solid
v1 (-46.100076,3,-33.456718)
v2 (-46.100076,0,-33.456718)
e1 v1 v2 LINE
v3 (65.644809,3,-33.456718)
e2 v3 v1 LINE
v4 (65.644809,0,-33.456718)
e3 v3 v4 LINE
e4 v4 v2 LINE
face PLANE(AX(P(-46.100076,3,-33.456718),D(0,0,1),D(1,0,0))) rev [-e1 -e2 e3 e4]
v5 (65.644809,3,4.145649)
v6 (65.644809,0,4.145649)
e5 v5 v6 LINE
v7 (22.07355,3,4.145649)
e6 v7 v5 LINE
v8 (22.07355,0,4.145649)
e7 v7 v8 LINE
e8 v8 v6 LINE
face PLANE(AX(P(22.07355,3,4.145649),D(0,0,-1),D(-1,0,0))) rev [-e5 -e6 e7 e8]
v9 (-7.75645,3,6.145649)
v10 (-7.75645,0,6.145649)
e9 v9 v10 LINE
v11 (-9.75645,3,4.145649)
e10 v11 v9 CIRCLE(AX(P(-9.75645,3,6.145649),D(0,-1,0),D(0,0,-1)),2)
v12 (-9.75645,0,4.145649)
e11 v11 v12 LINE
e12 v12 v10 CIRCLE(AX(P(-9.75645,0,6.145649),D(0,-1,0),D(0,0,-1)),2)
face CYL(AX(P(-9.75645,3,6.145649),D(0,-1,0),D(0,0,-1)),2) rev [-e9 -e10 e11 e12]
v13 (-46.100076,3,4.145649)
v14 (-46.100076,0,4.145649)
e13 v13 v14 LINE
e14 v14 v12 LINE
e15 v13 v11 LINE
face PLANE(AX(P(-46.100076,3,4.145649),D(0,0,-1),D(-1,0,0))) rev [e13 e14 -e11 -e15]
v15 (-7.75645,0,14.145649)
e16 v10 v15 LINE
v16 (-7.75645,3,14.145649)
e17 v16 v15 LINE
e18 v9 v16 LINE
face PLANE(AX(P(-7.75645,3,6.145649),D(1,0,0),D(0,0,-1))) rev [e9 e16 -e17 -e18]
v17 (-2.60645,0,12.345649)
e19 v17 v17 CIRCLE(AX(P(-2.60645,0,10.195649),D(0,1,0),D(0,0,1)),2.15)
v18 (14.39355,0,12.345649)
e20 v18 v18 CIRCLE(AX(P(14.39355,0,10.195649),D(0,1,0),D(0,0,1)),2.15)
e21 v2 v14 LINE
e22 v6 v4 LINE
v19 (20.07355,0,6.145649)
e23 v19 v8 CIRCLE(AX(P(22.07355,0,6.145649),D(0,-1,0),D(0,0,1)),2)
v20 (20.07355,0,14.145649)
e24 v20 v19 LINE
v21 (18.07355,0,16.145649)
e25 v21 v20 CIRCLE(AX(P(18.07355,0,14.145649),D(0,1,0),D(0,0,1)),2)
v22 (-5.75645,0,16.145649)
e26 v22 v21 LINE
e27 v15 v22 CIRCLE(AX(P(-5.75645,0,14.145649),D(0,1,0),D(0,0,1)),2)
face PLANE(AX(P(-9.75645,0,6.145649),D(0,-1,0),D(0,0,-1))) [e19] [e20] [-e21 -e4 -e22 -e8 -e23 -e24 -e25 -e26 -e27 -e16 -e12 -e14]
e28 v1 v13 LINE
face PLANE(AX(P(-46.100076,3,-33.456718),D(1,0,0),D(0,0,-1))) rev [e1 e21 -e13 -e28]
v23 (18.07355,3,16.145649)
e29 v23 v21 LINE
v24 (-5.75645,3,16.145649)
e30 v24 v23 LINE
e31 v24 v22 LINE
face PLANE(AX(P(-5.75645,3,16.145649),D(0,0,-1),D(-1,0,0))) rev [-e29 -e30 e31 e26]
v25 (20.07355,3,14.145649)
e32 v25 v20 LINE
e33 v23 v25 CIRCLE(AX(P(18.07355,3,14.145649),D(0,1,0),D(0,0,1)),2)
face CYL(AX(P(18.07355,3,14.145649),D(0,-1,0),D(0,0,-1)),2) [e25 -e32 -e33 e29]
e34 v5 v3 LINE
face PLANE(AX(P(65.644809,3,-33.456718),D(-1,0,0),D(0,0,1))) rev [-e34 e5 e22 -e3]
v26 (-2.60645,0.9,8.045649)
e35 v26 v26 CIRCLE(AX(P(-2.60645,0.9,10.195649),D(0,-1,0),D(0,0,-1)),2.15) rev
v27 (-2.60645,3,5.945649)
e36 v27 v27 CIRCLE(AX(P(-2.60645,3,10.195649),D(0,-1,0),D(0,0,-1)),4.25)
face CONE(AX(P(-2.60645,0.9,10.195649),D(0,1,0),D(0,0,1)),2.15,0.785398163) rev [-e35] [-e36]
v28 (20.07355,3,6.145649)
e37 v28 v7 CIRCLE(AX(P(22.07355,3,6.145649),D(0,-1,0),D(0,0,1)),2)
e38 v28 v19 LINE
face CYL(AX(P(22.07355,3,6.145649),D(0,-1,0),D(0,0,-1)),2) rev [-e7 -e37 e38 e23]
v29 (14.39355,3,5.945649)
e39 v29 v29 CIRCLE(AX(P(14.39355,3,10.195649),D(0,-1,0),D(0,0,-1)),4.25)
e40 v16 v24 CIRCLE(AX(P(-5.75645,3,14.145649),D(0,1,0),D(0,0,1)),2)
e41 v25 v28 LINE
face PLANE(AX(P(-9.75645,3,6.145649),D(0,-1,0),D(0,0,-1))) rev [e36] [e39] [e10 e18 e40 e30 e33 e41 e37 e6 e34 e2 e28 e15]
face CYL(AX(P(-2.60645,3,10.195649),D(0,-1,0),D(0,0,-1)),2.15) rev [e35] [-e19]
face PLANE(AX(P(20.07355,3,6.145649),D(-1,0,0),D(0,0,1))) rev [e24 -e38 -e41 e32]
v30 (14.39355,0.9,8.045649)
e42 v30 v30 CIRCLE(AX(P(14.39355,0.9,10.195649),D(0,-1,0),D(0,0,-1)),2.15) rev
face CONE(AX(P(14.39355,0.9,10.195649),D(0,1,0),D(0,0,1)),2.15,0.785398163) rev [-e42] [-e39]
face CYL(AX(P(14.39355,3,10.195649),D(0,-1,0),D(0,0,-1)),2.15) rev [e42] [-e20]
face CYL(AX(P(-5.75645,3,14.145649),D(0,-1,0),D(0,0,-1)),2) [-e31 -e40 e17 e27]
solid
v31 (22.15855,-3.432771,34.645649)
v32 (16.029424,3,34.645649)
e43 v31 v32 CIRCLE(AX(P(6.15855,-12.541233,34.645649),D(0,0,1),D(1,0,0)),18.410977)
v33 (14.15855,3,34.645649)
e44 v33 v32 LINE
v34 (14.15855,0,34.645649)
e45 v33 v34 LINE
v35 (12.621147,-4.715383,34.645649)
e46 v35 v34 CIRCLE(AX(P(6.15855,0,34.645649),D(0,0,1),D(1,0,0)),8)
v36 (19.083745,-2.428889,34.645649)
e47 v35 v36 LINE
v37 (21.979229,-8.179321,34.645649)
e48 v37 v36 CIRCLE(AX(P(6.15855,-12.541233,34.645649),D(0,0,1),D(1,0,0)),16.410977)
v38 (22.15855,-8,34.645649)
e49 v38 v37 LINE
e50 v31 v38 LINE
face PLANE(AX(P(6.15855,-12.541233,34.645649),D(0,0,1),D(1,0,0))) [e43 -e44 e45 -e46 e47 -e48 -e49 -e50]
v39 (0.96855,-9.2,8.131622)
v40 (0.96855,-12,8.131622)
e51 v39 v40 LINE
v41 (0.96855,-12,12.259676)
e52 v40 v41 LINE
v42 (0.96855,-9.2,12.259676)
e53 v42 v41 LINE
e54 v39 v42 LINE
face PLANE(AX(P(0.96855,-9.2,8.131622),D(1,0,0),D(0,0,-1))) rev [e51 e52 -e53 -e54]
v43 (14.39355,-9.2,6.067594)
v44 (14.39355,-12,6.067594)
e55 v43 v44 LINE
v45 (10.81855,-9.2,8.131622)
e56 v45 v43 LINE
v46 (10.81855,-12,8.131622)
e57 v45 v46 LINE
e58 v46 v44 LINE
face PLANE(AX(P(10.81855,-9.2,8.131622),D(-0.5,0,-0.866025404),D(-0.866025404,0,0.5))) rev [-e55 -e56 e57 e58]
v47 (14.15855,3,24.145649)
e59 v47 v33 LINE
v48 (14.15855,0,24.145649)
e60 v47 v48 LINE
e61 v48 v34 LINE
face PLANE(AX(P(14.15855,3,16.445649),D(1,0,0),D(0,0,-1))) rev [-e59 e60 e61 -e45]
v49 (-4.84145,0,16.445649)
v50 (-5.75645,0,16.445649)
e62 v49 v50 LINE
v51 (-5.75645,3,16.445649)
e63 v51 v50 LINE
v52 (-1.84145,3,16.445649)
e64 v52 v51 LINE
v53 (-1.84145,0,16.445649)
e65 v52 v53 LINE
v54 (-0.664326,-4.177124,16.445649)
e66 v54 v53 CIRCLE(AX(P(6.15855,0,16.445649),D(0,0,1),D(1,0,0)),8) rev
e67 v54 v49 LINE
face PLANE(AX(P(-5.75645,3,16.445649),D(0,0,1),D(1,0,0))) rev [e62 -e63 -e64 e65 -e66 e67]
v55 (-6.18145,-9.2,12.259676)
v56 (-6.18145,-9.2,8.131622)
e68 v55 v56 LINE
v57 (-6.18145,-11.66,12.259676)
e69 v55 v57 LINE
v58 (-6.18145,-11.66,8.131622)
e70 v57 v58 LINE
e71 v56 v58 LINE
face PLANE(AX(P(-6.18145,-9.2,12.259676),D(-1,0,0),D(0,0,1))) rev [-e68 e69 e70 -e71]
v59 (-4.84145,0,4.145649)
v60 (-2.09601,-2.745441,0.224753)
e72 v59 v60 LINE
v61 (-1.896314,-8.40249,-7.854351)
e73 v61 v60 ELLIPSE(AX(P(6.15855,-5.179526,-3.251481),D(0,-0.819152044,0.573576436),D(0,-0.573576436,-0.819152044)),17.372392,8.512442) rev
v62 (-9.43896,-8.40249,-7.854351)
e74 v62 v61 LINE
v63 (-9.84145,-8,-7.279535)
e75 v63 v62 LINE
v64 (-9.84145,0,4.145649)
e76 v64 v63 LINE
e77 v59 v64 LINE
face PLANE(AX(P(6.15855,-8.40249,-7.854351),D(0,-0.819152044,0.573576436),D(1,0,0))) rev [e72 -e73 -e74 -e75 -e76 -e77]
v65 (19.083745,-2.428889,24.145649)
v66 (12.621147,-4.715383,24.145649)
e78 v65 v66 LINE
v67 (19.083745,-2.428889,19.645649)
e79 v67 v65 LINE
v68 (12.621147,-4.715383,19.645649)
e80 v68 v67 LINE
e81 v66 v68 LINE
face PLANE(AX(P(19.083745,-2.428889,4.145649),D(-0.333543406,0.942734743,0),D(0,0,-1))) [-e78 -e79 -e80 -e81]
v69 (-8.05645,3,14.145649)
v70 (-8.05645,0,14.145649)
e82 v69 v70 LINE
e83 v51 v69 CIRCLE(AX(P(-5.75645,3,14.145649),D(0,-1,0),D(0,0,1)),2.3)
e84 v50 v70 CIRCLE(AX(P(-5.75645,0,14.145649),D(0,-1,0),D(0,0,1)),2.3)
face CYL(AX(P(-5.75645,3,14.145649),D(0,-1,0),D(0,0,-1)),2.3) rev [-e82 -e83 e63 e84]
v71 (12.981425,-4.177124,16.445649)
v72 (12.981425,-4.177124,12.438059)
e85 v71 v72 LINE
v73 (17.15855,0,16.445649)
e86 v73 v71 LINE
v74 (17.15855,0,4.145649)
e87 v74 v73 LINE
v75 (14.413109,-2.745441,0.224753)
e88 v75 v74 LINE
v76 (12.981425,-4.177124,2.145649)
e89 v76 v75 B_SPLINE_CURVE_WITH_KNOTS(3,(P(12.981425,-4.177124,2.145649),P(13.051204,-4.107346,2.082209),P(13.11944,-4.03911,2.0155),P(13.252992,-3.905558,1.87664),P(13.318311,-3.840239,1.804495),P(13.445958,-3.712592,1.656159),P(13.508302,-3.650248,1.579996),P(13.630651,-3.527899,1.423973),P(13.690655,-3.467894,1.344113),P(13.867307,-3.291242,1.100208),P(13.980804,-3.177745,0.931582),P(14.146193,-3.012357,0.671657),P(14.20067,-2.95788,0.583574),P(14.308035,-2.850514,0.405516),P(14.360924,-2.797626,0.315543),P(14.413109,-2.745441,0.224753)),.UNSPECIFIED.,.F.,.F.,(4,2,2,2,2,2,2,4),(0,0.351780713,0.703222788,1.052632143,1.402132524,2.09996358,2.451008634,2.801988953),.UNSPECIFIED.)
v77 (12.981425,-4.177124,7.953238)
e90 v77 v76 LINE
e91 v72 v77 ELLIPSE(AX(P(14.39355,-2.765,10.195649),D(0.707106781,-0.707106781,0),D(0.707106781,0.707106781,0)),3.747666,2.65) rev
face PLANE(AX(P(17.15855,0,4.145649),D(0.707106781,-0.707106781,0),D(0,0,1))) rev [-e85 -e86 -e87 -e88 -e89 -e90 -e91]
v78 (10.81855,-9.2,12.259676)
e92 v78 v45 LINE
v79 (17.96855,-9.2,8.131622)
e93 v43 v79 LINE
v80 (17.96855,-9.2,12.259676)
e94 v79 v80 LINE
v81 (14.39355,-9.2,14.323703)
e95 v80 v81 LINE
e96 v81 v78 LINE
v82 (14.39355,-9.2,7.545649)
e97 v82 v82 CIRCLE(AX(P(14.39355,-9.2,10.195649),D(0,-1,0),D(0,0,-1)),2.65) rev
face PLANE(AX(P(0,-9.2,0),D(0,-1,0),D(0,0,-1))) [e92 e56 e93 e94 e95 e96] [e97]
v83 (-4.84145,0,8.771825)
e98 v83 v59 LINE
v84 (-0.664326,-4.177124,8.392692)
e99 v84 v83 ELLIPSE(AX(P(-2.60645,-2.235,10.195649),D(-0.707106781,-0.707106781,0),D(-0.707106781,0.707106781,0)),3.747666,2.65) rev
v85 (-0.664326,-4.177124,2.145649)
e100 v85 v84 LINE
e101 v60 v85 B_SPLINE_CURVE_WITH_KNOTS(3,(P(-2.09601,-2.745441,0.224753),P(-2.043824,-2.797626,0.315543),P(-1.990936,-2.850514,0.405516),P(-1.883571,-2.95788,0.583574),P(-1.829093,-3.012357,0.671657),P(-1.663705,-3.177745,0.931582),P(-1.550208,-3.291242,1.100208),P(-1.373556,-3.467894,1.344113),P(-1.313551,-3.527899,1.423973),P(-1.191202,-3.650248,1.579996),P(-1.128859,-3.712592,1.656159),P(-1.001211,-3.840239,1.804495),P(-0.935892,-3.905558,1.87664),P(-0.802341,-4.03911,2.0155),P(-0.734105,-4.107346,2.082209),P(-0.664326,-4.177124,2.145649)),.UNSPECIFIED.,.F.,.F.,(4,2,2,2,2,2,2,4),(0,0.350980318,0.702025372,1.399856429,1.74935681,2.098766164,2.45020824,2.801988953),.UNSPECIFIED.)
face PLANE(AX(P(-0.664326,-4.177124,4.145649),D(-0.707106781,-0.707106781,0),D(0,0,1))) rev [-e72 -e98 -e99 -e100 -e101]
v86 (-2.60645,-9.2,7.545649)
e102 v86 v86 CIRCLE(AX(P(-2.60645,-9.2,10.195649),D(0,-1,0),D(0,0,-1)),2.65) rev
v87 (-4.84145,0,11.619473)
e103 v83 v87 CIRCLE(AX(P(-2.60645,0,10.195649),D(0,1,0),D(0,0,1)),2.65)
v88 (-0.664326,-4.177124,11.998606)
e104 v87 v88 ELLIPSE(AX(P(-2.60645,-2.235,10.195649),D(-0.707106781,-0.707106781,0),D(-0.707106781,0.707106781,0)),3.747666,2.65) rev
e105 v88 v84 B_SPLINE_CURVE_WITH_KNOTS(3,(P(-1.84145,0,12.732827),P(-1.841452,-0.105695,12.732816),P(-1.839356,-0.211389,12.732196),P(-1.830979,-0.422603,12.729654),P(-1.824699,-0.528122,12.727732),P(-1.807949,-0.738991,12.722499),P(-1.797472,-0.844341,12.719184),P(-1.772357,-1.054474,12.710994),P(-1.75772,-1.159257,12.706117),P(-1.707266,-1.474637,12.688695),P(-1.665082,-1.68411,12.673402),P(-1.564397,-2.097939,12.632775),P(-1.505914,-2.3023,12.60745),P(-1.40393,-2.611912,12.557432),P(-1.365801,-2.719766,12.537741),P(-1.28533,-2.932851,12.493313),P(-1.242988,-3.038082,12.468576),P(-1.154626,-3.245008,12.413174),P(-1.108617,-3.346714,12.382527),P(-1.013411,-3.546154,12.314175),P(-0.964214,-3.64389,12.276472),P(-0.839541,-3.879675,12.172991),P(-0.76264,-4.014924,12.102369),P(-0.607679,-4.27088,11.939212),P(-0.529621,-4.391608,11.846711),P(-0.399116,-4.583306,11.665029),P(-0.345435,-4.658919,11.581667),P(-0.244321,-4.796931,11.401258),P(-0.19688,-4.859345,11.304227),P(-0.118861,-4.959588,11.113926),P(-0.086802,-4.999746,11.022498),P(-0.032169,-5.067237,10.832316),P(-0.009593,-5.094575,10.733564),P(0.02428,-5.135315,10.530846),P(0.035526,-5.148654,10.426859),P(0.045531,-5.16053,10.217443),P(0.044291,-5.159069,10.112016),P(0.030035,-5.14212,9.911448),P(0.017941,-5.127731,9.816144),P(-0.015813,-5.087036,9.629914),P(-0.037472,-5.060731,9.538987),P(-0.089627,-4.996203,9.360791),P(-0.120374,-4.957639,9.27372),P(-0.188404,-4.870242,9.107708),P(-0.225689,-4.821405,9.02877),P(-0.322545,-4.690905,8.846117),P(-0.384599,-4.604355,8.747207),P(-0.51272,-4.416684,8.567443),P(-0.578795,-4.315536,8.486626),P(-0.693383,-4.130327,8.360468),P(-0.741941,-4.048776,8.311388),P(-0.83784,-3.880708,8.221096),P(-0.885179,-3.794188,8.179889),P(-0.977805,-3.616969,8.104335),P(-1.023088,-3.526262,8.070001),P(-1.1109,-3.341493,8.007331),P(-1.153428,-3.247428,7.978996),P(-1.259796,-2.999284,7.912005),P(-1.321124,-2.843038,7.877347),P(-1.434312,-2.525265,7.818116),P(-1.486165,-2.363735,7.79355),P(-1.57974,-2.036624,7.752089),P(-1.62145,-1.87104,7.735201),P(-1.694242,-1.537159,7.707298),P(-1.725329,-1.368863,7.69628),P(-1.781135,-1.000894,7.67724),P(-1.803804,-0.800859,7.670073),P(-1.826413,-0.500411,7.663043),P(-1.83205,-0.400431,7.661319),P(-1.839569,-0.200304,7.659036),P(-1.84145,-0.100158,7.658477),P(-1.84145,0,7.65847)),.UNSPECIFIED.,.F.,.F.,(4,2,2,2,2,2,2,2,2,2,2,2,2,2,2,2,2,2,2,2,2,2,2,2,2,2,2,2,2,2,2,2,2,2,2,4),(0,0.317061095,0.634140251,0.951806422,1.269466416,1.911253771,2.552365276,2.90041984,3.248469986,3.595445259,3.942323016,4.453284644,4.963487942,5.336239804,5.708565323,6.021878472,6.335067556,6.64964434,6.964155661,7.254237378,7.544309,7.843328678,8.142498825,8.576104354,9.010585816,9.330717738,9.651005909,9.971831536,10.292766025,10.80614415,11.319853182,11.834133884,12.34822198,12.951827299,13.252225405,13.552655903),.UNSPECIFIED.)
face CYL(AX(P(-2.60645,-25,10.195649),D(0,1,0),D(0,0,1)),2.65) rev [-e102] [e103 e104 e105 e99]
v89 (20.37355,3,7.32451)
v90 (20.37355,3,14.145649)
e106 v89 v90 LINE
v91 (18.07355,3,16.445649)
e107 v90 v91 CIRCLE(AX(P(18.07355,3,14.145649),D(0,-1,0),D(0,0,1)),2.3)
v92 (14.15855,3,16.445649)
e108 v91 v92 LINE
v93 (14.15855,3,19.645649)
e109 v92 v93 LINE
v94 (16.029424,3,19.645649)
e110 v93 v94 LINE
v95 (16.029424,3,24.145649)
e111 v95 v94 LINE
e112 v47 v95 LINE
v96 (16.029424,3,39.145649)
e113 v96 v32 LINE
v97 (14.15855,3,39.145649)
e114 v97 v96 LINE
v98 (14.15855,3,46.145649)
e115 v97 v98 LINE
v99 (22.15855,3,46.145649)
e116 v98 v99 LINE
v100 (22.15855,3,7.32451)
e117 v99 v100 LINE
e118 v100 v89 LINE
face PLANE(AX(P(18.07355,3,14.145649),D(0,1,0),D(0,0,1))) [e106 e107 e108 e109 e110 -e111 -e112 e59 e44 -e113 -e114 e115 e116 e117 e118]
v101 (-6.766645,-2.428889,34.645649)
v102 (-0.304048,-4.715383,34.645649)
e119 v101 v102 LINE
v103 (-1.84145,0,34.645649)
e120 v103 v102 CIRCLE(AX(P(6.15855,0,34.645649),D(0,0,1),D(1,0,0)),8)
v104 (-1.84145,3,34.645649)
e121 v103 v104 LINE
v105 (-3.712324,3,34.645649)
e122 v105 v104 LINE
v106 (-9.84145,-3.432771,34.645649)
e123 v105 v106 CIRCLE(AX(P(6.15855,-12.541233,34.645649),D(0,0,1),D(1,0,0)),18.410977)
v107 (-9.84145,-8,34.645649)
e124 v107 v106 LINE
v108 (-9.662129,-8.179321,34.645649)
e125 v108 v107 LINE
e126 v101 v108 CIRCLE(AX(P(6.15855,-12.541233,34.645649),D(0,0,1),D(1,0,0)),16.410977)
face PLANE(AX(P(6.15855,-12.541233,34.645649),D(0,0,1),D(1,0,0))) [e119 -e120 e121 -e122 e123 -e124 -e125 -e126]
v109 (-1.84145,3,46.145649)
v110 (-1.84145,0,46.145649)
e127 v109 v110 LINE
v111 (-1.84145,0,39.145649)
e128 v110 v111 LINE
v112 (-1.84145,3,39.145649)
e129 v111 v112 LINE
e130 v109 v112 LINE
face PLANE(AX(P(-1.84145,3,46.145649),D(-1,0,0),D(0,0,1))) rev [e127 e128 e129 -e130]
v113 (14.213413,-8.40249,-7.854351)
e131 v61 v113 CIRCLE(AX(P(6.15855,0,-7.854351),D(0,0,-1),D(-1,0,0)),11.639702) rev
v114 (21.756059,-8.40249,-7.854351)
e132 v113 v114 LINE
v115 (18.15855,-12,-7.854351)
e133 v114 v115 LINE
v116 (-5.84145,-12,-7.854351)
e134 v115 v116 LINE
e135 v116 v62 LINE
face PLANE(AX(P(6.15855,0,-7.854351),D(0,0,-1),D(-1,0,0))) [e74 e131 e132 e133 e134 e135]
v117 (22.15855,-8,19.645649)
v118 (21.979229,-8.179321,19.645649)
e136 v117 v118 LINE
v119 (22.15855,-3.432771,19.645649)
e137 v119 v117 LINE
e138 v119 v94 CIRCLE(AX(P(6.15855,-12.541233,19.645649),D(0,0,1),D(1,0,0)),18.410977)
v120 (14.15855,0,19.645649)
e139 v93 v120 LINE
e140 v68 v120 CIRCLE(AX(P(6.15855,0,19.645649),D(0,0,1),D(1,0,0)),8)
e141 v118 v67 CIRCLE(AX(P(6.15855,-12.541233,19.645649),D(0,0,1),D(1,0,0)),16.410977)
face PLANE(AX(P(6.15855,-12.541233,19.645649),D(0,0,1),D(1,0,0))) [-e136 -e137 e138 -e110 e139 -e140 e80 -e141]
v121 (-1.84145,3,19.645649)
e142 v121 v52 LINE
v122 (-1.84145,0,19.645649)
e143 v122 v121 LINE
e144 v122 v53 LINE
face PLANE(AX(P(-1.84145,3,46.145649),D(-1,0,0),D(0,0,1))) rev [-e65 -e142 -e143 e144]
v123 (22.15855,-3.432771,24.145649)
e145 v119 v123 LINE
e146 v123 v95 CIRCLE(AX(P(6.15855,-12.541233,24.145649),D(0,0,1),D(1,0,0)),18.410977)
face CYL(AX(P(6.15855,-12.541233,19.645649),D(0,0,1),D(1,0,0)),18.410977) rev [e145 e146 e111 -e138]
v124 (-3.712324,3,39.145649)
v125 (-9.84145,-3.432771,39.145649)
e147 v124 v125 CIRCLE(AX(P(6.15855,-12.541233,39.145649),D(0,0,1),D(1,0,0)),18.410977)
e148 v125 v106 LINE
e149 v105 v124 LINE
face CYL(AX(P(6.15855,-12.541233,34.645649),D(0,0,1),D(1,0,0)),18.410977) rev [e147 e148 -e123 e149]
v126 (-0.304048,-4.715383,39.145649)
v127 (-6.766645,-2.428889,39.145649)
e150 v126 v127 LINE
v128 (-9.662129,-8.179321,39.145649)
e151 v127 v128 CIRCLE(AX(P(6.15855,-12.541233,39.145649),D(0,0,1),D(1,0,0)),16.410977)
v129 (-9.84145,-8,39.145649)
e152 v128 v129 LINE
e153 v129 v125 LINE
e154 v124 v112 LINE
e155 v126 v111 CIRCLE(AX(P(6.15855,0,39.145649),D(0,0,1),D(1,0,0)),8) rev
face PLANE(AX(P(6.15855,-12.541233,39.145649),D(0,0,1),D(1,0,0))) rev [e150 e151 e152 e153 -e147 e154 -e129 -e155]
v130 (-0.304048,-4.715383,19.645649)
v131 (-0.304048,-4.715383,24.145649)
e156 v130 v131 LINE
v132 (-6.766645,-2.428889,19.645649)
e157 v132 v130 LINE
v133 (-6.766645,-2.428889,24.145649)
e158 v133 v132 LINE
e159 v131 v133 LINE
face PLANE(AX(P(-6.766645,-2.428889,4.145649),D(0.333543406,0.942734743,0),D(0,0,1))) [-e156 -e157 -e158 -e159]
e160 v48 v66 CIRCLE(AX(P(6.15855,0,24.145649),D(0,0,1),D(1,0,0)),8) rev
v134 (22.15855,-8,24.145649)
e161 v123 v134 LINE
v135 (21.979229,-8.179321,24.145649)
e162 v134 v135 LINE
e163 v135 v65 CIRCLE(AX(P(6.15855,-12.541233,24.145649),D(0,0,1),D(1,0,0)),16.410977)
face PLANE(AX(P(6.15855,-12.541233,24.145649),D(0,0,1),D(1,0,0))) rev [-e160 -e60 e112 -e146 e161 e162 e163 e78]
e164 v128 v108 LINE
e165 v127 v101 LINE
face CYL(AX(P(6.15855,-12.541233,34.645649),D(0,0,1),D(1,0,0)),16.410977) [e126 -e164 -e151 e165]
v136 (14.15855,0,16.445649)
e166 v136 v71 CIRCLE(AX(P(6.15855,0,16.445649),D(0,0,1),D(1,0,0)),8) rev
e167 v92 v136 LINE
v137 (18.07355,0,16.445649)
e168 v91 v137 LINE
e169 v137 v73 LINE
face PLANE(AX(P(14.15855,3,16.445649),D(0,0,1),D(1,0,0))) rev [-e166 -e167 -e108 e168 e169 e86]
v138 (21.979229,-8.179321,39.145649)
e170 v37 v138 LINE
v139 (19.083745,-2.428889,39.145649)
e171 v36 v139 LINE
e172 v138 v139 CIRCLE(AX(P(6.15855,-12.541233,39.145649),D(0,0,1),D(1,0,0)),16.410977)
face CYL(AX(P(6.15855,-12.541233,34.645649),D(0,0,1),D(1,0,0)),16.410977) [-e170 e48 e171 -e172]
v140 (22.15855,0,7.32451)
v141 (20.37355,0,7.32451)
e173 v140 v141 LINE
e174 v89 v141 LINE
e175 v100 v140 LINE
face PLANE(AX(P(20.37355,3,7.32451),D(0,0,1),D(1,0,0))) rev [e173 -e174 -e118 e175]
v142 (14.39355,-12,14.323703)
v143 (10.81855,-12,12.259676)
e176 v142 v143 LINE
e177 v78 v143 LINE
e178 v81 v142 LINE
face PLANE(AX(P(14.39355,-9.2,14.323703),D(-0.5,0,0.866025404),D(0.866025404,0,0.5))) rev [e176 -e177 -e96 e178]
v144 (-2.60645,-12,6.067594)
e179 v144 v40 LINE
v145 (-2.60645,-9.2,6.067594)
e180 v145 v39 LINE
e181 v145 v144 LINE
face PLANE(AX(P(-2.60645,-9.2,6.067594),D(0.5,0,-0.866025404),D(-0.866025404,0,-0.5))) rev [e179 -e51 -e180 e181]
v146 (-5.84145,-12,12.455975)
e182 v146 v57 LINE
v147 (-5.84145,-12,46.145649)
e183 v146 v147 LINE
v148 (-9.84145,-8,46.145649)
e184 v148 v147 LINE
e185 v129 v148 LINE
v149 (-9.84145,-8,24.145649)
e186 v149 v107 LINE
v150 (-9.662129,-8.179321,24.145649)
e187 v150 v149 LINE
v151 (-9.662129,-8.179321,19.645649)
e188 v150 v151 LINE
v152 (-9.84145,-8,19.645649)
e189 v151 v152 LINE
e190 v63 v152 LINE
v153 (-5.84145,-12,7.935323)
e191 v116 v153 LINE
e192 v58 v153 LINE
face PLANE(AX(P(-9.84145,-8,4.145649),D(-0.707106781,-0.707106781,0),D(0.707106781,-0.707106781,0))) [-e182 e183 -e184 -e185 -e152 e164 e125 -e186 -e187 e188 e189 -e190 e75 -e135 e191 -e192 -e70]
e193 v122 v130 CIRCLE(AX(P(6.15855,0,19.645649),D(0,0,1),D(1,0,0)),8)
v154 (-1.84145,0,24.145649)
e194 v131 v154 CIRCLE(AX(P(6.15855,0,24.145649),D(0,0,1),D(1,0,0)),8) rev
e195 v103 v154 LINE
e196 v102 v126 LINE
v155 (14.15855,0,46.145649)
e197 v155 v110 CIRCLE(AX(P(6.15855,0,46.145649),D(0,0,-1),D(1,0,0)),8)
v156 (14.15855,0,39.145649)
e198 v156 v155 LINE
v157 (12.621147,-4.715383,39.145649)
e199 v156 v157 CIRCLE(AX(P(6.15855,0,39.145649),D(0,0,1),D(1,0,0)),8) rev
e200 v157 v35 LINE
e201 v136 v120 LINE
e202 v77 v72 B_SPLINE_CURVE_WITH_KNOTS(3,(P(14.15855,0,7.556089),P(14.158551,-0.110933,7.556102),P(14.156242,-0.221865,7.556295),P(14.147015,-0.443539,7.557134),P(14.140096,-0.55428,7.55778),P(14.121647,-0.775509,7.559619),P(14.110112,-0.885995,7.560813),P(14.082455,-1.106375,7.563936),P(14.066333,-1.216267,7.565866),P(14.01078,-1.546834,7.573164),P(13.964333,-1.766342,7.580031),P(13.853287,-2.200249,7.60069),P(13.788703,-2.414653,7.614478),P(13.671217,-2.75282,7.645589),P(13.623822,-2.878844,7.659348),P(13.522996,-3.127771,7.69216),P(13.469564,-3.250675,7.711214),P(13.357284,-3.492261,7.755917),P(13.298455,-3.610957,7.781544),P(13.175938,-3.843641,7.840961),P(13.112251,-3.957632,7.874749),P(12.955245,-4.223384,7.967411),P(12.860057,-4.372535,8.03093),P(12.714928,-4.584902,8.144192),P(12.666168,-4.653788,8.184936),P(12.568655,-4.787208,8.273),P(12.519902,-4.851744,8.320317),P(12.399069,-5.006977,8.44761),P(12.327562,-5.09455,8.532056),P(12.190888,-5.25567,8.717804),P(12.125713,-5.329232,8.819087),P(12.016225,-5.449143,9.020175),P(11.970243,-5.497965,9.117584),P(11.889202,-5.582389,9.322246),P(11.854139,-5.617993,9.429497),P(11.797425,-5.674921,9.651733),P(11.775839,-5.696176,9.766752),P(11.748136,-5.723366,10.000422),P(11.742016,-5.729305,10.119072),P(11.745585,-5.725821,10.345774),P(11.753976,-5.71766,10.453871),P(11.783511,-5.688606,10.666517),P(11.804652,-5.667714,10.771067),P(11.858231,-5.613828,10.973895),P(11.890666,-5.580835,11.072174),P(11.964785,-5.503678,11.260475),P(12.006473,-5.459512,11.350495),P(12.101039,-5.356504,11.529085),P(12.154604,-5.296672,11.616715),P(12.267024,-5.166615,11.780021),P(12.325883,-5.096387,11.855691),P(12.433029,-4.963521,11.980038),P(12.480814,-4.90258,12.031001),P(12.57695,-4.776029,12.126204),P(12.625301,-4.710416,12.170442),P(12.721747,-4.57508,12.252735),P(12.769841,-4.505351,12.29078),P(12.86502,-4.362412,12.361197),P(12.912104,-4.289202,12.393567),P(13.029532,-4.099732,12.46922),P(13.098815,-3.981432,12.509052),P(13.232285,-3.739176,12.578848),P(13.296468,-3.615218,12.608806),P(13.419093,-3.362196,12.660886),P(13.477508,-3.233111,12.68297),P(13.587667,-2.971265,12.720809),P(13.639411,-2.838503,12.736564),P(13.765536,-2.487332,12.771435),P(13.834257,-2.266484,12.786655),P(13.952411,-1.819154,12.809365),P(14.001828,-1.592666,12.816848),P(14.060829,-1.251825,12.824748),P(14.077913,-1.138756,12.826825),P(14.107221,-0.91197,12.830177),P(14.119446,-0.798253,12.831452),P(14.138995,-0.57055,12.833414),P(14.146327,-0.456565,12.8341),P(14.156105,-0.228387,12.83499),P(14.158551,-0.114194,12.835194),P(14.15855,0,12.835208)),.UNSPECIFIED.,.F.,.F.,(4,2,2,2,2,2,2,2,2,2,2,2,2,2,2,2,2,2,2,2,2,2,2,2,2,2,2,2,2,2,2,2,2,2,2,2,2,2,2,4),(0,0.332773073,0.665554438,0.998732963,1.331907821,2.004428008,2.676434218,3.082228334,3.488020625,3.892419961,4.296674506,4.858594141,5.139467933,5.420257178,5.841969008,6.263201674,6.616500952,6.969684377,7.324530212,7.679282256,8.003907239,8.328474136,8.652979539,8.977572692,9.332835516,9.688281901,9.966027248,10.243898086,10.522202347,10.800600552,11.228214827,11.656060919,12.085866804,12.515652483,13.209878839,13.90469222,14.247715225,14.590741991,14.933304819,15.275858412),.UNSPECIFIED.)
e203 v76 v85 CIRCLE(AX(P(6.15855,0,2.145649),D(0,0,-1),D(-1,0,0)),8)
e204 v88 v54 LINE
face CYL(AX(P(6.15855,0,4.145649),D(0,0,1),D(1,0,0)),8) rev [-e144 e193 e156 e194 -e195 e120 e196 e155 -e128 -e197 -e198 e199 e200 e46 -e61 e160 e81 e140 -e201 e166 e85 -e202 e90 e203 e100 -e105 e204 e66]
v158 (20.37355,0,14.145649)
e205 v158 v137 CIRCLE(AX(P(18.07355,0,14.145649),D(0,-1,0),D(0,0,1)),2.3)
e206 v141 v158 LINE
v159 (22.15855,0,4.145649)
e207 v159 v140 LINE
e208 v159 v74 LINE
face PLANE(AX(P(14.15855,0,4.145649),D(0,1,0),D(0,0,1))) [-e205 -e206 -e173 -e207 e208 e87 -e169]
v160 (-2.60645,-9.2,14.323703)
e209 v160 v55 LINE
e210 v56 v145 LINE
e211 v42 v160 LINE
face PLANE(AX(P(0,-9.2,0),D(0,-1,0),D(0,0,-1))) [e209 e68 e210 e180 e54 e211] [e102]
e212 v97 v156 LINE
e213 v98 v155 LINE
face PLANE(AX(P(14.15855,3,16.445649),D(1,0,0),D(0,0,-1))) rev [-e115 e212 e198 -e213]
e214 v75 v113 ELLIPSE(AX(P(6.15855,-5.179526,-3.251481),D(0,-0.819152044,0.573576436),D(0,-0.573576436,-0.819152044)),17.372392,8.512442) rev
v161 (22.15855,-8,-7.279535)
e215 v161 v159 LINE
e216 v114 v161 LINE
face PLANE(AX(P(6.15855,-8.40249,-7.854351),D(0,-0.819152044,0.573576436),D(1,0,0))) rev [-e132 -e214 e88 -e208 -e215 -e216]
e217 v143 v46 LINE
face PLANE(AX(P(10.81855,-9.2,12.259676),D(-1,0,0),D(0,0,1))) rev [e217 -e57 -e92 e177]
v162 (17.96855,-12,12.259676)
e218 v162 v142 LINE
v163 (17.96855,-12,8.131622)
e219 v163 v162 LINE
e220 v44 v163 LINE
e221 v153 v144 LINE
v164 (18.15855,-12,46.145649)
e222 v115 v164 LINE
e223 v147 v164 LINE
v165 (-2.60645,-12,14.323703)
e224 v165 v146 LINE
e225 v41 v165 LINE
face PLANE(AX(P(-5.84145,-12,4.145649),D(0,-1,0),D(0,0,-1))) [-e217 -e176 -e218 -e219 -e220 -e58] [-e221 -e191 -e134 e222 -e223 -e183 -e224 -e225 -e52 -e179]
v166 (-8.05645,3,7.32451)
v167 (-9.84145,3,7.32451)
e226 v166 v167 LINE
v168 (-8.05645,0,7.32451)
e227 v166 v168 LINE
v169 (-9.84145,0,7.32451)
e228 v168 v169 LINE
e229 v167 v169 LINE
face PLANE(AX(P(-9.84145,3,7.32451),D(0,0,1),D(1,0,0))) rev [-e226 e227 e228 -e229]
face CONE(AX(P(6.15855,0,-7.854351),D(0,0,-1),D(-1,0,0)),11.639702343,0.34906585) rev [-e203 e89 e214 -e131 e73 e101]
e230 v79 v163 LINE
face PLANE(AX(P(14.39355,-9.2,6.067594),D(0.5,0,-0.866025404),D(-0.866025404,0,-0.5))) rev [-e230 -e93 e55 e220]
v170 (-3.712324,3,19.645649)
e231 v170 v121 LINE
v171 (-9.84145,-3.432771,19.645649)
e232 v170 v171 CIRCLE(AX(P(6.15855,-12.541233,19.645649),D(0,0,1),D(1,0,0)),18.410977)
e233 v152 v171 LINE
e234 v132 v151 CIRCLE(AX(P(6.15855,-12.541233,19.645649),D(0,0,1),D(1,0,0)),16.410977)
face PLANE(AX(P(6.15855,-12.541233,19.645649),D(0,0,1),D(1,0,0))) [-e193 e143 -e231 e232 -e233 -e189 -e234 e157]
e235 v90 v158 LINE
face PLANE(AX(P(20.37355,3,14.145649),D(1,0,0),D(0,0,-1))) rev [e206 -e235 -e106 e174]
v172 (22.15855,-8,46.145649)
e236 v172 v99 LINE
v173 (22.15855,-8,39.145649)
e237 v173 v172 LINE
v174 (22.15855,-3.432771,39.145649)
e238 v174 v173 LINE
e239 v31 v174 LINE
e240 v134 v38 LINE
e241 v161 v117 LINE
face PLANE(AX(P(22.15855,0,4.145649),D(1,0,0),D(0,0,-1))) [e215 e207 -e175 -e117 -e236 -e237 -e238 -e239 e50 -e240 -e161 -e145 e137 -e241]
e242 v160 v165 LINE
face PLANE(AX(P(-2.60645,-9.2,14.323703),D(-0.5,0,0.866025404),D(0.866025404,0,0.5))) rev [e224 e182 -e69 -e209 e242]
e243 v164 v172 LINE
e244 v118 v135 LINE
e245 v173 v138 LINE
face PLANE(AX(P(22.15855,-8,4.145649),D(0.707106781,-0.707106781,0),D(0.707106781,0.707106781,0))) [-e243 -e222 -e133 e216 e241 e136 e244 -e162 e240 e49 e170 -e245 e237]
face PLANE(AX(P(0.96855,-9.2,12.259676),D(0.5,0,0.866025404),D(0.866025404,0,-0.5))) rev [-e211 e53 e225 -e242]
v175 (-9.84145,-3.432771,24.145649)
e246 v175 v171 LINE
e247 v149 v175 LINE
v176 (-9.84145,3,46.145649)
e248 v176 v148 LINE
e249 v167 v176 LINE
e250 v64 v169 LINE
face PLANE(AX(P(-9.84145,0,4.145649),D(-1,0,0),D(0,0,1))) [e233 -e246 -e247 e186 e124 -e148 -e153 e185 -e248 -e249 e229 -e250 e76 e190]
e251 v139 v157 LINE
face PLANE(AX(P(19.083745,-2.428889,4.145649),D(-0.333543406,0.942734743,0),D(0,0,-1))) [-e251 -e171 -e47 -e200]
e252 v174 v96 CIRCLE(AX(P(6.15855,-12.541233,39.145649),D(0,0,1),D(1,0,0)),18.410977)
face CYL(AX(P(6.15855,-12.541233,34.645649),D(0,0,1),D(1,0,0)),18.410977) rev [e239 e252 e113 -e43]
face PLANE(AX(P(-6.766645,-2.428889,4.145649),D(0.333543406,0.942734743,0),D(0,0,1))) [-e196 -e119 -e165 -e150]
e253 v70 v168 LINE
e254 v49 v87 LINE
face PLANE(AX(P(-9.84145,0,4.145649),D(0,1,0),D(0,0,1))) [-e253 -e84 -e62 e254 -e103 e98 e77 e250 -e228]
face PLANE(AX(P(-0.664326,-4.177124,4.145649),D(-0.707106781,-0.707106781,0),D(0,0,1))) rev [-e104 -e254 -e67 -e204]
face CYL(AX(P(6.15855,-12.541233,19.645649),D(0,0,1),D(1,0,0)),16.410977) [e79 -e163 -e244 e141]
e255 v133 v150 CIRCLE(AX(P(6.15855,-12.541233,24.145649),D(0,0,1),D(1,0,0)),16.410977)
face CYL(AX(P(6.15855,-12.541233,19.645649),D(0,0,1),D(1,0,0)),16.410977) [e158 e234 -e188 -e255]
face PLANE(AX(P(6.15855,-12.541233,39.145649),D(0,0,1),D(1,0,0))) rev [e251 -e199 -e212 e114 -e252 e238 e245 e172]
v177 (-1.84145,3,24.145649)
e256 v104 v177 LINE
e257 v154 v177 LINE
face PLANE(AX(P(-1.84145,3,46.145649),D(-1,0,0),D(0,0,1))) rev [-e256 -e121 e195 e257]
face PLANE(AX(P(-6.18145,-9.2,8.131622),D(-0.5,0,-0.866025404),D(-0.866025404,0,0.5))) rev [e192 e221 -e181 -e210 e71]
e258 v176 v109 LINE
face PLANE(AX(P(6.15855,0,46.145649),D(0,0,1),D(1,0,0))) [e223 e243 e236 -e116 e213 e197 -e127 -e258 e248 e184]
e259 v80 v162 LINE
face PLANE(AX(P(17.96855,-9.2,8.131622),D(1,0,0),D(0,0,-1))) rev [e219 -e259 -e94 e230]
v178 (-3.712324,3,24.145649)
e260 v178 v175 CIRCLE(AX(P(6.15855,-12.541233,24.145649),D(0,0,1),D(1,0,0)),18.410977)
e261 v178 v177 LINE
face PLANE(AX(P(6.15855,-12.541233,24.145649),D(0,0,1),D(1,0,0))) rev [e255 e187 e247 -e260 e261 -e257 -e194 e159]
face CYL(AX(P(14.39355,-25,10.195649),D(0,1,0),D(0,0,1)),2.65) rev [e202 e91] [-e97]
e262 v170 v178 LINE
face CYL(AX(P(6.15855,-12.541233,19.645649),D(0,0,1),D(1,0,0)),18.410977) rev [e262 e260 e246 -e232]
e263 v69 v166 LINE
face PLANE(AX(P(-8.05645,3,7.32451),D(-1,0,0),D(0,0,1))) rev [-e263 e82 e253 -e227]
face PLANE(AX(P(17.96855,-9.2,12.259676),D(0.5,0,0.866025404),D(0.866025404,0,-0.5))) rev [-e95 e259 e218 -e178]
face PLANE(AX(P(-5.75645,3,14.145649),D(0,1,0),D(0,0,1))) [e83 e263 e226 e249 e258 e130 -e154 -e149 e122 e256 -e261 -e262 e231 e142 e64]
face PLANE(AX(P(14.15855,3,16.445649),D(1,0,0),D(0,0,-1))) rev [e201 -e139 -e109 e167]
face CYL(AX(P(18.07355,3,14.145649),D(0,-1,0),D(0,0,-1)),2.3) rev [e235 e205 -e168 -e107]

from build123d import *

# Parameters (mm, degrees)
SKETCH1_R                = 2.15
BOSS_EXTRUDE1_DEPTH      = 3
CHAMFER1_SIZE            = 2.1
BOSS_EXTRUDE3_DEPTH      = 30
BOSS_EXTRUDE3_DEPTH_BACK = 12
SKETCH4_R                = 2.65
CUT_EXTRUDE1_DEPTH       = 25
CUT_EXTRUDE2_DEPTH       = 2.8
BOSS_EXTRUDE4_DEPTH      = 3
BOSS_EXTRUDE5_DEPTH      = 12
CHAMFER3_SIZE            = 10
CHAMFER3_SIZE2           = 3.639702343
CUT_EXTRUDE_THIN1_START  = -7
SKETCH9_R                = 18.410976788
SKETCH9_R_2              = 16.410976788
CUT_EXTRUDE_THIN1_DEPTH  = 4.5
CHAMFER4_START           = 34.645648855
CHAMFER4_DEPTH           = 4.5
CUT_EXTRUDE_THIN2_START  = -22
SKETCH9_2_R              = 18.410976788
SKETCH9_2_R_2            = 16.410976788
CUT_EXTRUDE_THIN2_DEPTH  = 4.5
CHAMFER5_START           = 19.645648855
CHAMFER5_DEPTH           = 4.5
CHAMFER6_SIZE            = 8.402490459
CHAMFER6_SIZE_2          = 12
CHAMFER7_SIZE            = 3


with BuildPart() as part:
    # Sketch1 → Boss-Extrude1 (new body)
    with BuildSketch(Plane(origin=(0, 0, 0), x_dir=(1, 0, 0), z_dir=(0, 1, 0))):
        with BuildLine():
            Line((22.073549618, -4.145648855), (65.64480916, -4.145648855))
            Line((65.64480916, -4.145648855), (65.64480916, 33.456717557))
            Line((65.64480916, 33.456717557), (-46.100076336, 33.456717557))
            Line((-46.100076336, 33.456717557), (-46.100076336, -4.145648855))
            Line((-46.100076336, -4.145648855), (-9.756450382, -4.145648855))
            ThreePointArc((-9.756450382, -4.145648855), (-8.342236819, -4.731435293), (-7.756450382, -6.145648855))
            Line((-7.756450382, -6.145648855), (-7.756450382, -14.145648855))
            ThreePointArc((-7.756450382, -14.145648855), (-7.170663944, -15.559862417), (-5.756450382, -16.145648855))
            Line((-5.756450382, -16.145648855), (18.073549618, -16.145648855))
            ThreePointArc((18.073549618, -16.145648855), (19.487763181, -15.559862417), (20.073549618, -14.145648855))
            Line((20.073549618, -14.145648855), (20.073549618, -6.145648855))
            ThreePointArc((20.073549618, -6.145648855), (20.659336056, -4.731435293), (22.073549618, -4.145648855))
        make_face()
        with Locations(Location((14.393549618, -10.195648855, 0), (0, 0, 270))):
            Circle(SKETCH1_R, mode=Mode.SUBTRACT)
        with Locations(Location((-2.606450382, -10.195648855, 0), (0, 0, 270))):
            Circle(SKETCH1_R, mode=Mode.SUBTRACT)
    extrude(amount=BOSS_EXTRUDE1_DEPTH)

    # Chamfer1
    chamfer1_edges = [part.edges().sort_by_distance(p)[0] for p in [
        (14.393549618, 3, 8.045648855),
        (-2.606450382, 3, 8.045648855),
    ]]
    chamfer(chamfer1_edges, length=CHAMFER1_SIZE)


with BuildPart() as body_2:
    # Sketch3 → Boss-Extrude3 (new, two sides: drawn at the far end of the back side and taken through both)
    with BuildSketch(Plane.XY.offset(16.145648855).offset(-BOSS_EXTRUDE3_DEPTH_BACK)):
        with BuildLine():
            Line((-9.841450382, 0), (-1.841450382, 0))
            ThreePointArc((-1.841450382, 0), (6.158549618, -8), (14.158549618, 0))
            Line((14.158549618, 0), (22.158549618, 0))
            Line((22.158549618, 0), (22.158549618, -8))
            Line((22.158549618, -8), (18.158549618, -12))
            Line((18.158549618, -12), (-5.841450382, -12))
            Line((-5.841450382, -12), (-9.841450382, -8))
            Line((-9.841450382, -8), (-9.841450382, 0))
        make_face()
    extrude(amount=BOSS_EXTRUDE3_DEPTH + BOSS_EXTRUDE3_DEPTH_BACK)

    # Sketch4 → Cut-Extrude1 (cut)
    with BuildSketch(Plane(origin=(0, 0, 0), x_dir=(1, 0, 0), z_dir=(0, 1, 0))):
        with Locations(Location((14.393549618, -10.195648855, 0), (0, 0, 264.912370403))):
            Circle(SKETCH4_R)
        with Locations(Location((-2.606450382, -10.195648855, 0), (0, 0, 286.778900879))):
            Circle(SKETCH4_R)
    extrude(amount=-CUT_EXTRUDE1_DEPTH, mode=Mode.SUBTRACT)

    # Sketch5 → Cut-Extrude2 (cut)
    with BuildSketch(Plane.XZ.offset(12)):
        Polygon((14.393549618, 14.32370328), (10.818549618, 12.259676067), (10.818549618, 8.131621643), (14.393549618, 6.06759443), (17.968549618, 8.131621643), (17.968549618, 12.259676067), align=None)
        Polygon((-2.606450382, 14.32370328), (-6.181450382, 12.259676067), (-6.181450382, 8.131621643), (-2.606450382, 6.06759443), (0.968549618, 8.131621643), (0.968549618, 12.259676067), align=None)
    extrude(amount=-CUT_EXTRUDE2_DEPTH, mode=Mode.SUBTRACT)

    # Sketch6 → Boss-Extrude4 (add)
    with BuildSketch(Plane(origin=(0, 0, 0), x_dir=(1, 0, 0), z_dir=(0, 1, 0))):
        with BuildLine():
            Line((14.158549618, -16.445648855), (14.158549618, -46.145648855))
            Line((14.158549618, -46.145648855), (22.158549618, -46.145648855))
            Line((22.158549618, -46.145648855), (22.158549618, -7.32451012))
            Line((22.158549618, -7.32451012), (20.373549618, -7.32451012))
            Line((20.373549618, -7.32451012), (20.373549618, -14.145648855))
            ThreePointArc((20.373549618, -14.145648855), (19.699895215, -15.771994452), (18.073549618, -16.445648855))
            Line((18.073549618, -16.445648855), (14.158549618, -16.445648855))
        make_face()
        with BuildLine():
            Line((-9.841450382, -7.32451012), (-9.841450382, -46.145648855))
            Line((-9.841450382, -46.145648855), (-1.841450382, -46.145648855))
            Line((-1.841450382, -46.145648855), (-1.841450382, -16.445648855))
            Line((-1.841450382, -16.445648855), (-5.756450382, -16.445648855))
            ThreePointArc((-5.756450382, -16.445648855), (-7.382795978, -15.771994452), (-8.056450382, -14.145648855))
            Line((-8.056450382, -14.145648855), (-8.056450382, -7.32451012))
            Line((-8.056450382, -7.32451012), (-9.841450382, -7.32451012))
        make_face()
    extrude(amount=BOSS_EXTRUDE4_DEPTH)

    # Sketch7 → Boss-Extrude5 (add)
    with BuildSketch(Plane(origin=(0, 0, 4.145648855), x_dir=(-1, 0, 0), z_dir=(0, 0, -1))):
        with BuildLine():
            Line((9.841450382, -8), (9.841450382, 0))
            Line((9.841450382, 0), (1.841450382, 0))
            ThreePointArc((1.841450382, 0), (-6.158549618, -8), (-14.158549618, 0))
            Line((-14.158549618, 0), (-22.158549618, 0))
            Line((-22.158549618, 0), (-22.158549618, -8))
            Line((-22.158549618, -8), (-18.158549618, -12))
            Line((-18.158549618, -12), (5.841450382, -12))
            Line((5.841450382, -12), (9.841450382, -8))
        make_face()
    extrude(amount=BOSS_EXTRUDE5_DEPTH)

    # Chamfer3
    chamfer3_edges = [body_2.edges().sort_by_distance(p)[0] for p in [
        (6.158549618, -8, -7.854351145),
    ]]
    chamfer3_side = [body_2.faces().sort_by_distance(p)[0] for p in [
        (6.158549618, -8, 19.145648855),
    ]]
    chamfer(chamfer3_edges, length=CHAMFER3_SIZE, length2=CHAMFER3_SIZE2, reference=chamfer3_side[0])

    # Sketch9 → Cut-Extrude-Thin1 (cut)
    with BuildSketch(Plane.XY.offset(46.145648855).offset(CUT_EXTRUDE_THIN1_START)):
        with Locations((6.158549618, -12.541232702)):
            Circle(SKETCH9_R)
        with Locations((6.158549618, -12.541232702)):
            Circle(SKETCH9_R_2, mode=Mode.SUBTRACT)
    extrude(amount=-CUT_EXTRUDE_THIN1_DEPTH, mode=Mode.SUBTRACT)

    # Chamfer4: read off the stored shape, not the designer's step
    # Chamfer4 outline → Chamfer4 (cut)
    with BuildSketch(Plane.XY.offset(CHAMFER4_START)):
        with BuildLine():
            Line((-6.766645452, -2.428889178), (-0.304047917, -4.715382603))
            ThreePointArc((-0.304047917, -4.715382603), (-1.447394777, -2.479840692), (-1.841450382, 0))
            Line((-1.841450382, 0), (-1.841450382, 1.787764442))
            ThreePointArc((-1.841450382, 1.787764442), (-4.514359504, -0.07491127), (-6.766645452, -2.428889178))
        make_face()
        with BuildLine():
            ThreePointArc((14.158549618, 0), (13.764494013, -2.479840692), (12.621147154, -4.715382603))
            Line((12.621147154, -4.715382603), (19.083744689, -2.428889178))
            ThreePointArc((19.083744689, -2.428889178), (16.83145874, -0.074911271), (14.158549618, 1.787764442))
            Line((14.158549618, 1.787764442), (14.158549618, 0))
        make_face()
    extrude(amount=CHAMFER4_DEPTH, mode=Mode.SUBTRACT)

    # Sketch9<2> → Cut-Extrude-Thin2 (cut)
    with BuildSketch(Plane.XY.offset(46.145648855).offset(CUT_EXTRUDE_THIN2_START)):
        with Locations((6.158549618, -12.541232702)):
            Circle(SKETCH9_2_R)
        with Locations((6.158549618, -12.541232702)):
            Circle(SKETCH9_2_R_2, mode=Mode.SUBTRACT)
    extrude(amount=-CUT_EXTRUDE_THIN2_DEPTH, mode=Mode.SUBTRACT)

    # Chamfer5: read off the stored shape, not the designer's step
    # Chamfer5 outline → Chamfer5 (cut)
    with BuildSketch(Plane.XY.offset(CHAMFER5_START)):
        with BuildLine():
            Line((-6.766645452, -2.428889178), (-0.304047917, -4.715382603))
            ThreePointArc((-0.304047917, -4.715382603), (-1.447394777, -2.479840692), (-1.841450382, 0))
            Line((-1.841450382, 0), (-1.841450382, 1.787764442))
            ThreePointArc((-1.841450382, 1.787764442), (-4.514359504, -0.07491127), (-6.766645452, -2.428889178))
        make_face()
        with BuildLine():
            ThreePointArc((14.158549618, 0), (13.764494013, -2.479840692), (12.621147154, -4.715382603))
            Line((12.621147154, -4.715382603), (19.083744689, -2.428889178))
            ThreePointArc((19.083744689, -2.428889178), (16.83145874, -0.074911271), (14.158549618, 1.787764442))
            Line((14.158549618, 1.787764442), (14.158549618, 0))
        make_face()
    extrude(amount=CHAMFER5_DEPTH, mode=Mode.SUBTRACT)

    # Chamfer6
    # the kernel refuses this chamfer: 12, 8.402490459 mm, written as the material it takes off along each edge
    with BuildSketch(Plane(origin=(-13.192374802, 0, -7.854351145), x_dir=(0, -1, 0), z_dir=(1, 0, 0))) as chamfer6_piece_1:
        Polygon((CHAMFER6_SIZE, 0), (0, -CHAMFER6_SIZE_2), (0, 0), align=None)
    extrude(amount=66.341551184, mode=Mode.SUBTRACT)
    with BuildSketch(Plane(origin=(-40.832077145, 0, -7.854351145), x_dir=(0, 0, 1), z_dir=(1, 0, 0))) as chamfer6_piece_2:
        Polygon((CHAMFER6_SIZE_2, 0), (0, CHAMFER6_SIZE), (0, 0), align=None)
    extrude(amount=66.341551184, mode=Mode.SUBTRACT)

    # Chamfer7
    # the kernel refuses this chamfer: 3 mm, written as the material it takes off along each edge
    with BuildSketch(Plane(origin=(-1.841450382, 0, 16.445648855), x_dir=(-1, 0, 0), z_dir=(0, 0, -1))) as chamfer7_piece_1:
        with BuildLine():
            Line((CHAMFER7_SIZE, 0), (-1.177124344, -4.177124344))
            ThreePointArc((-1.177124344, -4.177124344), (-0.314888309, -2.222399221), (0, 0))
            Line((0, 0), (CHAMFER7_SIZE, 0))
        make_face()
    extrude(amount=14.825043224, mode=Mode.SUBTRACT)
    with BuildSketch(Plane(origin=(-1.841450382, 0, 18.770692079), x_dir=(-1, 0, 0), z_dir=(0, 0, -1))) as chamfer7_piece_2_section:
        with BuildLine():
            Line((CHAMFER7_SIZE, 0), (-1.177124344, -4.177124344))
            ThreePointArc((-1.177124344, -4.177124344), (-0.314888309, -2.222399221), (0, 0))
            Line((0, 0), (CHAMFER7_SIZE, 0))
        make_face()
    chamfer7_piece_2 = extrude(amount=25.737264999, mode=Mode.PRIVATE)
    chamfer7_piece_2 = split(chamfer7_piece_2, bisect_by=Plane(origin=(-1.841450382, 0, 16.445648855), z_dir=(0, 0, -1)), keep=Keep.TOP, mode=Mode.PRIVATE)
    add(chamfer7_piece_2, mode=Mode.SUBTRACT)
    with BuildSketch(Plane(origin=(14.158549618, 0, 18.668311008), x_dir=(-0.2712384034926293, -0.9625121965309165, 0), z_dir=(0, 0, -1))) as chamfer7_piece_3_section:
        with BuildLine():
            Line((4.339814456, 0), (-CHAMFER7_SIZE * 0.271238403493, -CHAMFER7_SIZE * 0.962512196531))
            Line((-CHAMFER7_SIZE * 0.271238403493, -CHAMFER7_SIZE * 0.962512196531), (0, 0))
            ThreePointArc((0, 0), (2.224496158, -0.299716179), (4.339814456, 0))
        make_face()
    chamfer7_piece_3 = extrude(amount=25.634883928, mode=Mode.PRIVATE)
    chamfer7_piece_3 = split(chamfer7_piece_3, bisect_by=Plane(origin=(14.158549618, 0, 16.445648855), z_dir=(0, 0, -1)), keep=Keep.TOP, mode=Mode.PRIVATE)
    add(chamfer7_piece_3, mode=Mode.SUBTRACT)


solid = Compound([part.part, body_2.part])
